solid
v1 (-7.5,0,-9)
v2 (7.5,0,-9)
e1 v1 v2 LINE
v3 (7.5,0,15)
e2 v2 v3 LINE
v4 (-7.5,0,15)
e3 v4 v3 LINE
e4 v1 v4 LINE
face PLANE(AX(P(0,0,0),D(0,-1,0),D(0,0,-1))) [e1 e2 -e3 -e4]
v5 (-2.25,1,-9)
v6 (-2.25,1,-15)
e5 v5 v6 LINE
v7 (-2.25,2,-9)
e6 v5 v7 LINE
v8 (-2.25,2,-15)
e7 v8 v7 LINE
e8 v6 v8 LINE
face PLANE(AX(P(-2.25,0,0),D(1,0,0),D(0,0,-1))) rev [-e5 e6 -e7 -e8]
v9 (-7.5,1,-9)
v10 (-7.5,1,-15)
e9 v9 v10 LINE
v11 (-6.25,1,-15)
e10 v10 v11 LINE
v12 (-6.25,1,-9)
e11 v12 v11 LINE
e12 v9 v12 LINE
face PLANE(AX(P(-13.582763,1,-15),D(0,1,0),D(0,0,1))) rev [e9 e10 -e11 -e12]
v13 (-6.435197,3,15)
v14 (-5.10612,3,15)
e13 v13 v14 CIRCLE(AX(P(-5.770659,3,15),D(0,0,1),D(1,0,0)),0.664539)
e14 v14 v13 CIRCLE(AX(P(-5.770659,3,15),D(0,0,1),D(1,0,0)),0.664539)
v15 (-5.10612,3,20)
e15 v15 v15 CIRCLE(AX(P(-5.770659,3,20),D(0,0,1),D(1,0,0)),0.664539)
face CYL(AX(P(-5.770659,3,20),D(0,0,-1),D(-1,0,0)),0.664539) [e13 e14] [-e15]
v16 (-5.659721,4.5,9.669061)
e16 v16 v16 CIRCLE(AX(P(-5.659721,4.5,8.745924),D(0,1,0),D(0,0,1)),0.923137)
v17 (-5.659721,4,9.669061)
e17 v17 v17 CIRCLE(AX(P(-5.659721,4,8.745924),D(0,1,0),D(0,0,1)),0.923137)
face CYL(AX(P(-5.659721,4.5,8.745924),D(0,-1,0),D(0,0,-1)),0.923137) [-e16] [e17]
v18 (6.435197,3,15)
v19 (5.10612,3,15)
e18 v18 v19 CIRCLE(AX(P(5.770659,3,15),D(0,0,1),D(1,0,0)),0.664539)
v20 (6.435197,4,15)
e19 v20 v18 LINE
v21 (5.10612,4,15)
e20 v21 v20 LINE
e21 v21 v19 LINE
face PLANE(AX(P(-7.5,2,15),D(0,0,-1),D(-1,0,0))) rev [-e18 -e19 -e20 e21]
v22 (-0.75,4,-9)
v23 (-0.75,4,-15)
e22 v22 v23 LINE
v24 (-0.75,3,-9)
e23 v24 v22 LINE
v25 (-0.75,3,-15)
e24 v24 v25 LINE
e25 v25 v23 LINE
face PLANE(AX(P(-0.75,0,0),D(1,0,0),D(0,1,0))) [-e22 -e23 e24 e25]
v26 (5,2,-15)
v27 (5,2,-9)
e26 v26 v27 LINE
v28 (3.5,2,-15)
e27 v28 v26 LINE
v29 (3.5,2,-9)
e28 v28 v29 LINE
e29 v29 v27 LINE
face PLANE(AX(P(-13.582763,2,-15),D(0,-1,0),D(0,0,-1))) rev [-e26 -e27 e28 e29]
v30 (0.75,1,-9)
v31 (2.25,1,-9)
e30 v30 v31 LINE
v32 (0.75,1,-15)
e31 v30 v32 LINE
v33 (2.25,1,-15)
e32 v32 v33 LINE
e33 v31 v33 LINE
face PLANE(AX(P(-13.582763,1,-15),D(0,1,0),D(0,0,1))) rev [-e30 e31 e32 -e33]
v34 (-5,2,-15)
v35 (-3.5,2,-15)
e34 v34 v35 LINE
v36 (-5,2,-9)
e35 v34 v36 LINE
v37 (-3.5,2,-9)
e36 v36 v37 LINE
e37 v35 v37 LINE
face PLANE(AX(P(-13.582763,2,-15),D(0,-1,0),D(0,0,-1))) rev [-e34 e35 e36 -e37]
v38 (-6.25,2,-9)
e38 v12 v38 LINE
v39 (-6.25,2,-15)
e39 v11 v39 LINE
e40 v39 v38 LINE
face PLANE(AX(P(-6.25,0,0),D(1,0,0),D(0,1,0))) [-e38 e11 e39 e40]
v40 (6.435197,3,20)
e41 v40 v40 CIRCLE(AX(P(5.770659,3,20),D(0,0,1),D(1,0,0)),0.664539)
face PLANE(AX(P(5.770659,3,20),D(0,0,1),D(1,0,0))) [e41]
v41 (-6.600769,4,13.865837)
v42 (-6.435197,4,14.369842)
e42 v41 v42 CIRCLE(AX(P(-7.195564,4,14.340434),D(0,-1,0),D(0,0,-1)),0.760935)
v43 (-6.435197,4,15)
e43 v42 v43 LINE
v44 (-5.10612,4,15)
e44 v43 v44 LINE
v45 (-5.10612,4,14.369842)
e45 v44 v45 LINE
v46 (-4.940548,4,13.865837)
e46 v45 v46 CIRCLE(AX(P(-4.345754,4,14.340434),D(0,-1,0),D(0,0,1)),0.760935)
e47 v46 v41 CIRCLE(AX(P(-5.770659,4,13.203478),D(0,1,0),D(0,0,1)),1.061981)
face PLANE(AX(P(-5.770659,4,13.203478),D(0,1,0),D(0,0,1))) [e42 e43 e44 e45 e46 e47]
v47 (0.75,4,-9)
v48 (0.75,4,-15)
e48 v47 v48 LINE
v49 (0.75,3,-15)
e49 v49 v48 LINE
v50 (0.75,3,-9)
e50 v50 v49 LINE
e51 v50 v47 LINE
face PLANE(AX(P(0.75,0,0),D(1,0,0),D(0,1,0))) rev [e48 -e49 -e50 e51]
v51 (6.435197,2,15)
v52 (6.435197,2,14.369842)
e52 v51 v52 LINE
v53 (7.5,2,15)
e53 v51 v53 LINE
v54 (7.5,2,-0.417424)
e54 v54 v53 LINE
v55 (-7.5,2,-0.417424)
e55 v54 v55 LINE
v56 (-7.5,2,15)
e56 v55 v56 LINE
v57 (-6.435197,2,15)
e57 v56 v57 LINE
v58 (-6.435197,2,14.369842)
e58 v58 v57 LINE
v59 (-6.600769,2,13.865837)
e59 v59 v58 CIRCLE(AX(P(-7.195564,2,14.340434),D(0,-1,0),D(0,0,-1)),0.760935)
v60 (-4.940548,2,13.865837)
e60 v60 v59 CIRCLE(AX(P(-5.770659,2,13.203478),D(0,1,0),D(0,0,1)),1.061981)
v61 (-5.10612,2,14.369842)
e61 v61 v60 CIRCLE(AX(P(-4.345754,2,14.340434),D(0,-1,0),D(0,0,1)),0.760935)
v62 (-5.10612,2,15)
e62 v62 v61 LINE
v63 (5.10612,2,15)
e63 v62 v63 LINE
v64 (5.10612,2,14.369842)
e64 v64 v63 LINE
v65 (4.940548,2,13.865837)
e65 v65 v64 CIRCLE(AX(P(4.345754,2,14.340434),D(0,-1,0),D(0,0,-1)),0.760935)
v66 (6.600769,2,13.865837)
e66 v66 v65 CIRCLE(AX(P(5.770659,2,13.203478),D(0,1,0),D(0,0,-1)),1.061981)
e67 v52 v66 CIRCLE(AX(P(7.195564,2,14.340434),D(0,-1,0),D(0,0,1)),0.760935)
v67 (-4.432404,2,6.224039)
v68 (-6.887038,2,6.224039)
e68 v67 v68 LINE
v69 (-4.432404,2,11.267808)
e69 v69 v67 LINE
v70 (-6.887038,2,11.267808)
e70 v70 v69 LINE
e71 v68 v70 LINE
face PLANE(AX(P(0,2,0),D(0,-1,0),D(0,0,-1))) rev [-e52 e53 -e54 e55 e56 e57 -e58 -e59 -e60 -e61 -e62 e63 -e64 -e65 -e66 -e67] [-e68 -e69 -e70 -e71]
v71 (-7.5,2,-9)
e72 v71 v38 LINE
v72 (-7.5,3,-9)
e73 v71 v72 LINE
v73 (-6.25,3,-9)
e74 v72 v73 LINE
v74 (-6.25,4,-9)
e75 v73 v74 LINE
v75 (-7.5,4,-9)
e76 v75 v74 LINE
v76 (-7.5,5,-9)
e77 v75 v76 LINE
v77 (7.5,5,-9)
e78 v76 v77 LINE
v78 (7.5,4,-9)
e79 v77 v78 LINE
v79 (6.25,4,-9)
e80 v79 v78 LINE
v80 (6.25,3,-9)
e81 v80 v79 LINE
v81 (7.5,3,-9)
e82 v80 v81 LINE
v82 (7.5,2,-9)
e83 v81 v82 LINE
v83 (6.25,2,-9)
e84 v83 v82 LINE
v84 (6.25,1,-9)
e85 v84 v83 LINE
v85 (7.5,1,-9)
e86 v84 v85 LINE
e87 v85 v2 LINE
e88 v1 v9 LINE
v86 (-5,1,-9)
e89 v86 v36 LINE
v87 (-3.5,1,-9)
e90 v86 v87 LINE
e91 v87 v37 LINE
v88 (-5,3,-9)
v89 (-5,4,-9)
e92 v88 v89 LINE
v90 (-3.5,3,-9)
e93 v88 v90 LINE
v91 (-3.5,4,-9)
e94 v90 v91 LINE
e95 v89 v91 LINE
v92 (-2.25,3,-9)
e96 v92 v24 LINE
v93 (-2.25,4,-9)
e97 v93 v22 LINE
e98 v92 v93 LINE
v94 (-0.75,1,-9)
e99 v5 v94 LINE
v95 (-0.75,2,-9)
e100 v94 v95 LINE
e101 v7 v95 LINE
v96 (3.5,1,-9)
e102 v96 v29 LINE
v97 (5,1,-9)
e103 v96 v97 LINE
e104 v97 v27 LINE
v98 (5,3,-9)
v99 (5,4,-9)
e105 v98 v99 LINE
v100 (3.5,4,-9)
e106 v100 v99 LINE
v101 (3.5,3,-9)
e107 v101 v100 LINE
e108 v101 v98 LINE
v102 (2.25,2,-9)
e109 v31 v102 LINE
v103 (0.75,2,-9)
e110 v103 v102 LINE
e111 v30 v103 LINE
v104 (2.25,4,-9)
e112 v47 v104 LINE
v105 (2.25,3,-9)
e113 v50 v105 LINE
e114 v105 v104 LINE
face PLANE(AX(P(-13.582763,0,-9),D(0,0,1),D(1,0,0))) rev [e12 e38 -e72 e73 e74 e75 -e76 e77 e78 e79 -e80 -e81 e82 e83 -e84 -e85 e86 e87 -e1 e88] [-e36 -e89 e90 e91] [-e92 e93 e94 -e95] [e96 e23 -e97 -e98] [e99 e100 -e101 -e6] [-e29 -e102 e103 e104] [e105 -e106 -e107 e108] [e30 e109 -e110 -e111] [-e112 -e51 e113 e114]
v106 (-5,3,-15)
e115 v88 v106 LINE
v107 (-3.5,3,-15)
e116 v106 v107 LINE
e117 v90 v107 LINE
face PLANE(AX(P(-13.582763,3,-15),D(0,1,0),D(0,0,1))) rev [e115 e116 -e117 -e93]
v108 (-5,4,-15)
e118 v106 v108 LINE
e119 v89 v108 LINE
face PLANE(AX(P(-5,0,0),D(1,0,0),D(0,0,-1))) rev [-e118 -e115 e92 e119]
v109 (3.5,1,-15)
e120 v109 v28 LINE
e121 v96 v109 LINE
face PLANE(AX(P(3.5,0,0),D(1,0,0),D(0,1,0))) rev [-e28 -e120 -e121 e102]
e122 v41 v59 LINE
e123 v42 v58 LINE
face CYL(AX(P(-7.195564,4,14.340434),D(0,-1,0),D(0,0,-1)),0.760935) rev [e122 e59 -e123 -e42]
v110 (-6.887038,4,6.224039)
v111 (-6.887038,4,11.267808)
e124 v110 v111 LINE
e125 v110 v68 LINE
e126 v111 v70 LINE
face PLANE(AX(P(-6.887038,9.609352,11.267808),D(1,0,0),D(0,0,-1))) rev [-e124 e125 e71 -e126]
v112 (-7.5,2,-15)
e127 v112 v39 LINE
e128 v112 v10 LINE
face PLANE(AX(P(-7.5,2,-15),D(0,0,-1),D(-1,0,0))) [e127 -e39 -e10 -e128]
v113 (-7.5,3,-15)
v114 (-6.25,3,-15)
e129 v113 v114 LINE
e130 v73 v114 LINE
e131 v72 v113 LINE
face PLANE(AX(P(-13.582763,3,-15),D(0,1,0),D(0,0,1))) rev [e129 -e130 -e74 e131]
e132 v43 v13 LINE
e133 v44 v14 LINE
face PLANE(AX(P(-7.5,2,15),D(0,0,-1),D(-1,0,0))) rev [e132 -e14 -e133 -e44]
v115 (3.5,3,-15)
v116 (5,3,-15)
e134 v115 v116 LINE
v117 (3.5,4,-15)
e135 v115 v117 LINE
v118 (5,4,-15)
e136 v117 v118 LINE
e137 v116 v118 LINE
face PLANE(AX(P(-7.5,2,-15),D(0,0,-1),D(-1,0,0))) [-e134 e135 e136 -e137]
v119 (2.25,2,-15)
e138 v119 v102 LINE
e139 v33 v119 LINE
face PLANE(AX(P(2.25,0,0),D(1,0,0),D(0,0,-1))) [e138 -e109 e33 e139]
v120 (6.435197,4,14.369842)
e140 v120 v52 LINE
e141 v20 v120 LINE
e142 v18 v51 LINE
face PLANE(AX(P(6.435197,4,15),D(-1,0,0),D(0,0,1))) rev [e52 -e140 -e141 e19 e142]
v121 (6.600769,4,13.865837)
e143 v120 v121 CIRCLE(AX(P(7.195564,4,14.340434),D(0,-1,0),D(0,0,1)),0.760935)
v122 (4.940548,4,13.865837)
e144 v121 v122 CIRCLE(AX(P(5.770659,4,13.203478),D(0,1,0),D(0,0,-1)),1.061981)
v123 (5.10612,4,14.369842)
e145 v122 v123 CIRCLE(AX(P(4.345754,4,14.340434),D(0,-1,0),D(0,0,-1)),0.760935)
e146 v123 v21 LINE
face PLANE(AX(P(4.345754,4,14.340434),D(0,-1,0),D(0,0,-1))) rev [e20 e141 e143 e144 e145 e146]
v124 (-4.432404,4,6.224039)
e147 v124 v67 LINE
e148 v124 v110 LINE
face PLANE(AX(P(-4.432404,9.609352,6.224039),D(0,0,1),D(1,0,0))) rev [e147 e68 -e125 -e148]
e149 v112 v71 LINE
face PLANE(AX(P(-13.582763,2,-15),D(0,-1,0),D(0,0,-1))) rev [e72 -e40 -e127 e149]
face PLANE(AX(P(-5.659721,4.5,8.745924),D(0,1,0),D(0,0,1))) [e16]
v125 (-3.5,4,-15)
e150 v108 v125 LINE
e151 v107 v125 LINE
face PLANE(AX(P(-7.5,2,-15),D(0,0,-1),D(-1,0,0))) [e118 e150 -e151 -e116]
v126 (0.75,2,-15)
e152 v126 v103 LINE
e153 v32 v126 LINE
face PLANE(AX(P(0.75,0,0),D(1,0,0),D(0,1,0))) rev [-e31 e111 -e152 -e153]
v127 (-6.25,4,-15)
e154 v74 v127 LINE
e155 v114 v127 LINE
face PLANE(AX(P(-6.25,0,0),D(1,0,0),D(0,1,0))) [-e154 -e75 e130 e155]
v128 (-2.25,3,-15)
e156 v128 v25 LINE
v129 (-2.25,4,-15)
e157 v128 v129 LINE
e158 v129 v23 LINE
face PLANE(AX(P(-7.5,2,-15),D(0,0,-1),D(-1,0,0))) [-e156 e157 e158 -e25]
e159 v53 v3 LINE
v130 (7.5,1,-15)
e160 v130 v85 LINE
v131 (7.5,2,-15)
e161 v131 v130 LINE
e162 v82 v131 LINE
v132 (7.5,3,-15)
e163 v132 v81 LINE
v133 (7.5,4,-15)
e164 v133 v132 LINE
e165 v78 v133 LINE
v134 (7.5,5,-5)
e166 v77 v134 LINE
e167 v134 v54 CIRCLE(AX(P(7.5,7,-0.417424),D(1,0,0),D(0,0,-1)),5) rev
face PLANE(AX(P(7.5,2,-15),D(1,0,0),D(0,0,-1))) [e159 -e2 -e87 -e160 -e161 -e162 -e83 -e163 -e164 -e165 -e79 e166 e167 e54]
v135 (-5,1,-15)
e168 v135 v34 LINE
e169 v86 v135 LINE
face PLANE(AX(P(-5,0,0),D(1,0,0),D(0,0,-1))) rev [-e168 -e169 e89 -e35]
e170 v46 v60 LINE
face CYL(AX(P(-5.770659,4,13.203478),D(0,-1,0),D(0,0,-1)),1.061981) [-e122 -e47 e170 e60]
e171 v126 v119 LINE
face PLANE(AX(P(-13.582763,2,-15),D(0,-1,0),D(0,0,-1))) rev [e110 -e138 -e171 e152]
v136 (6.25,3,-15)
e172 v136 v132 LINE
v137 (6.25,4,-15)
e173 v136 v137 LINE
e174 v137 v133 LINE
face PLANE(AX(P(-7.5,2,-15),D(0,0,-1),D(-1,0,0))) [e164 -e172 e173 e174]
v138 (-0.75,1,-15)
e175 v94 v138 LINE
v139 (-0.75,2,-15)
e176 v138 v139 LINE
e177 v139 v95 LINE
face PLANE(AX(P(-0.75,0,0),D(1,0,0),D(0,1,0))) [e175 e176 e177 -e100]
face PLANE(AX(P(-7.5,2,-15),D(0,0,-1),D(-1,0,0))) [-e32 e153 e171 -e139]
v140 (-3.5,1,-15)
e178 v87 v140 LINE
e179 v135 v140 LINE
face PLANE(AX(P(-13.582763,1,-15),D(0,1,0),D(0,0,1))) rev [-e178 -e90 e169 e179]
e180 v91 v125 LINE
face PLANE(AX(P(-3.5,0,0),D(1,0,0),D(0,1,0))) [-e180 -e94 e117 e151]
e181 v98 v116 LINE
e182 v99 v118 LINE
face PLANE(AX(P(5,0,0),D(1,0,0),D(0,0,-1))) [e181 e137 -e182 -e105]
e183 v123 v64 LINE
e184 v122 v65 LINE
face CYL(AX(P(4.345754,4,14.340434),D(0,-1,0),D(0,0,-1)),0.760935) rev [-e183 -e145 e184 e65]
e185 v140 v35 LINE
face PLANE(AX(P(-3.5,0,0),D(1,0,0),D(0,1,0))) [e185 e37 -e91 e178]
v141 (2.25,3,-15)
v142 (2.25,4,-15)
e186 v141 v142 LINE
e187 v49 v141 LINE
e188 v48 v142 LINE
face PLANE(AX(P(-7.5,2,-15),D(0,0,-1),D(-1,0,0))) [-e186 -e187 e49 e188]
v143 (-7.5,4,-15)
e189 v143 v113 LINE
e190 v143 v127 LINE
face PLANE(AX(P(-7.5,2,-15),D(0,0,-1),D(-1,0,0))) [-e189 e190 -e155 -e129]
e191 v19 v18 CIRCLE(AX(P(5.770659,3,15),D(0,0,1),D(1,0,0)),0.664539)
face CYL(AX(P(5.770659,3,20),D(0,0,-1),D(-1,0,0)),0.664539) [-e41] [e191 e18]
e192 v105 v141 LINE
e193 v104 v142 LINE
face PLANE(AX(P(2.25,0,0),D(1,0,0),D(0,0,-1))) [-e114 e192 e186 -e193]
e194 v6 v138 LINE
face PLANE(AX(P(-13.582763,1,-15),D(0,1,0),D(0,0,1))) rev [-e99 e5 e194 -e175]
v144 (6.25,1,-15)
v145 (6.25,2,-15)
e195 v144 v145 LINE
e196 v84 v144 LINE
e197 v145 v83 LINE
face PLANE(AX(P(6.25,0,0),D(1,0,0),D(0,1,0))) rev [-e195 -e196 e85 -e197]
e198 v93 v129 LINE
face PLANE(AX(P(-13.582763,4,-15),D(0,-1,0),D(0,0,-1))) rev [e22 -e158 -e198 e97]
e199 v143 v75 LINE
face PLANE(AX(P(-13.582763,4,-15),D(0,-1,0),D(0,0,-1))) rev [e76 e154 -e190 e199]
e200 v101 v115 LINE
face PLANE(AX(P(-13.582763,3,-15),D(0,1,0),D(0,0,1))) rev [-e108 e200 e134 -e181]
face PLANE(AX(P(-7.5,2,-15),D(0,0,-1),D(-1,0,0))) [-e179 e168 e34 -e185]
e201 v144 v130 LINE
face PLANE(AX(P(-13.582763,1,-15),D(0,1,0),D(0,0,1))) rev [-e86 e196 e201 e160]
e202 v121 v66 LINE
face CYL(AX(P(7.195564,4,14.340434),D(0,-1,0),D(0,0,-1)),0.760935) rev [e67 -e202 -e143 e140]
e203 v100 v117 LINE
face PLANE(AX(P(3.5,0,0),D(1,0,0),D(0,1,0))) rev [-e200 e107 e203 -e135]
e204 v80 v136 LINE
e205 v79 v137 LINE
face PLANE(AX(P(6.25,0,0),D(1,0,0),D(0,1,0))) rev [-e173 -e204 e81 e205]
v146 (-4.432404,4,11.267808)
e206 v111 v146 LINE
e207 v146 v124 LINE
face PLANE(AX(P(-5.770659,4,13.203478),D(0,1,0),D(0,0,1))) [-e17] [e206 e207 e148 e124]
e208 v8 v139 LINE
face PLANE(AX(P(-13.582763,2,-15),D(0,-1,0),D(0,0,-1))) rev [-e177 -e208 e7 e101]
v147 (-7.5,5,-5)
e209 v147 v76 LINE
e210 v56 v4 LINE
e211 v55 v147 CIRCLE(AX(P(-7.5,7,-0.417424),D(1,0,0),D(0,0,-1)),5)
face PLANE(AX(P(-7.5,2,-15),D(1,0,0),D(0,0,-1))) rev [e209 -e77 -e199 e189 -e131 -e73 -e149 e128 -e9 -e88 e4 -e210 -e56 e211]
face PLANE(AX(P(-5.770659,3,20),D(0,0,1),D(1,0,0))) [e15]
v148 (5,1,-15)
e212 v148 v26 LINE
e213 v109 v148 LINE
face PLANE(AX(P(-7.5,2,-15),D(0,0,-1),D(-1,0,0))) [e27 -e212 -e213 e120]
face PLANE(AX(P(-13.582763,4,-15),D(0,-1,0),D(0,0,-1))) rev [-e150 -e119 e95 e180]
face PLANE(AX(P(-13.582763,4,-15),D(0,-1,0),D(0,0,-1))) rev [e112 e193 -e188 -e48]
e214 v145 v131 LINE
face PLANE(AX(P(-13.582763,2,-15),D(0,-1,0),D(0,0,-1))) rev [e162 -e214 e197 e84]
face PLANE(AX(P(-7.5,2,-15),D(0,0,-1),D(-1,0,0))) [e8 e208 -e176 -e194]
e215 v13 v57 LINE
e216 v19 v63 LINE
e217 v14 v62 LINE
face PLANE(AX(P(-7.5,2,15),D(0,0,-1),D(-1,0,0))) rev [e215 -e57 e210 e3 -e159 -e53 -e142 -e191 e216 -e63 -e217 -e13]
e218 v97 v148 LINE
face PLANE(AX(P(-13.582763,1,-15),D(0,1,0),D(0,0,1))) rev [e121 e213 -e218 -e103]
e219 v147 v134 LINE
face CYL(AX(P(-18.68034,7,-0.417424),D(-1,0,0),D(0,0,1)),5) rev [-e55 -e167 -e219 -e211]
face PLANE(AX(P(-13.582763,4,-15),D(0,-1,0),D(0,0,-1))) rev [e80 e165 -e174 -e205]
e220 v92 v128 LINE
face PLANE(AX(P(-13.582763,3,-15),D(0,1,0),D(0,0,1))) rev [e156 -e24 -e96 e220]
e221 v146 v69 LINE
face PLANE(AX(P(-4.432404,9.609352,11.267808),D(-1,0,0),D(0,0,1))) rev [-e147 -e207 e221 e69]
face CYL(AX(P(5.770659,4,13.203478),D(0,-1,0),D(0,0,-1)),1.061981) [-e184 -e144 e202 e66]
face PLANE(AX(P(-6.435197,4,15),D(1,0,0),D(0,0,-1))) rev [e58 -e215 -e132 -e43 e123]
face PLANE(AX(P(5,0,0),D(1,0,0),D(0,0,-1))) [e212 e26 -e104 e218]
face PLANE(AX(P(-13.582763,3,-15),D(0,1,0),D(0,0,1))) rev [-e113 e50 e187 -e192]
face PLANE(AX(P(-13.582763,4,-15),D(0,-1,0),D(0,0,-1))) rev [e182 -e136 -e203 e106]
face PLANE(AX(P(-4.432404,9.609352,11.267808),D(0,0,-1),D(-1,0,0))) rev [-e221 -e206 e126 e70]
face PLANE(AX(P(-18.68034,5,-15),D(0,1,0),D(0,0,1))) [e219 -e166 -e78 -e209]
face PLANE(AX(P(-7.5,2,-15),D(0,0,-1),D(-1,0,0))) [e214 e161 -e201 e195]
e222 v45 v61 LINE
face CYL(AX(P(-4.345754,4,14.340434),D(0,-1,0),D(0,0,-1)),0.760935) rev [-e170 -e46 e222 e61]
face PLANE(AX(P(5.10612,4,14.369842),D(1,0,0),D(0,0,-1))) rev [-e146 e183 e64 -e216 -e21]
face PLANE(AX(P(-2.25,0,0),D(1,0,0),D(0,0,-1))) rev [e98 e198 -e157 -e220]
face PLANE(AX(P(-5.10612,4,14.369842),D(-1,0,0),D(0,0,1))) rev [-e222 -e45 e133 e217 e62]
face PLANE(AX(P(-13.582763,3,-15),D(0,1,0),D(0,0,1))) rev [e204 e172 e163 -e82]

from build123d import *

# Parameters (mm, degrees)
SKETCH2_W           = 15
SKETCH2_H           = 30
BOSS_EXTRUDE1_DEPTH = 2
SKETCH3_W           = 10
SKETCH3_H           = 5
BOSS_EXTRUDE2_DEPTH = 15
SKETCH4_W           = 6
SKETCH4_H           = 1
CUT_EXTRUDE1_DEPTH  = 15
SKETCH5_W           = 1.25
SKETCH5_H           = 6
SKETCH5_W_2         = 0.75
CUT_EXTRUDE2_DEPTH  = 18.24093965
FILLET1_R           = 5
BOSS_EXTRUDE3_DEPTH = 2
SKETCH7_R           = 0.66453872
BOSS_EXTRUDE4_DEPTH = 5
SKETCH8_W           = 2.454634116
SKETCH8_H           = 5.043768733
BOSS_EXTRUDE5_DEPTH = 2
SKETCH9_R           = 0.923137451
BOSS_EXTRUDE6_DEPTH = 0.5


with BuildPart() as part:
    # Sketch2 → Boss-Extrude1 (new body)
    with BuildSketch(Plane(origin=(0, 0, 0), x_dir=(1, 0, 0), z_dir=(0, 1, 0))):
        Rectangle(SKETCH2_W, SKETCH2_H)
    extrude(amount=BOSS_EXTRUDE1_DEPTH)

    # Sketch3 → Boss-Extrude2 (add)
    with BuildSketch(Plane(origin=(7.5, 0, 0), x_dir=(0, 0, -1), z_dir=(1, 0, 0))):
        with Locations((10, 2.5)):
            Rectangle(SKETCH3_W, SKETCH3_H)
    extrude(amount=-BOSS_EXTRUDE2_DEPTH)

    # Sketch4 → Cut-Extrude1 (cut)
    with BuildSketch(Plane(origin=(7.5, 0, 0), x_dir=(0, 0, -1), z_dir=(1, 0, 0))):
        with Locations((12, 0.5)):
            Rectangle(SKETCH4_W, SKETCH4_H)
        with Locations((12, 2.5)):
            Rectangle(SKETCH4_W, SKETCH4_H)
        with Locations((12, 4.5)):
            Rectangle(SKETCH4_W, SKETCH4_H)
    extrude(amount=-CUT_EXTRUDE1_DEPTH, mode=Mode.SUBTRACT)

    # Sketch5 → Cut-Extrude2 (cut, through all)
    with BuildSketch(Plane(origin=(0, 4, 0), x_dir=(1, 0, 0), z_dir=(0, 1, 0))):
        with Locations((5.625, 12)):
            Rectangle(SKETCH5_W, SKETCH5_H)
        with Locations((2.875, 12)):
            Rectangle(SKETCH5_W, SKETCH5_H)
        with Locations((0.375, 12)):
            Rectangle(SKETCH5_W_2, SKETCH5_H)
        with Locations((-0.375, 12)):
            Rectangle(SKETCH5_W_2, SKETCH5_H)
        with Locations((-2.875, 12)):
            Rectangle(SKETCH5_W, SKETCH5_H)
        with Locations((-5.625, 12)):
            Rectangle(SKETCH5_W, SKETCH5_H)
    extrude(amount=-CUT_EXTRUDE2_DEPTH, mode=Mode.SUBTRACT)

    # Fillet1
    # the kernel refuses this fillet: 5 mm, written as the material it adds along each edge
    with BuildSketch(Plane(origin=(-7.5, 2, -5), x_dir=(0, 1, 0), z_dir=(1, 0, 0))) as fillet1_piece_1:
        with BuildLine():
            CenterArc((5, 4.582575695), FILLET1_R, 180, 66.421821522)
            Line((0, 4.582575695), (-0.1, 4.582575695))
            Line((-0.1, 4.582575695), (-0.1, 0))
            Line((-0.1, 0), (0, -0.1))
            ThreePointArc((0, -0.1), (1.5, -0.1), (2.96, -0.091651514))
            Line((2.96, -0.091651514), (3, 0))
        make_face()
    extrude(amount=15)

    # Sketch6 → Boss-Extrude3 (add)
    with BuildSketch(Plane(origin=(0, 2, 0), x_dir=(1, 0, 0), z_dir=(0, 1, 0))):
        with BuildLine():
            Line((5.106120026, -14.369842053), (5.106120026, -15))
            Line((5.106120026, -15), (6.435197466, -15))
            Line((6.435197466, -15), (6.435197466, -14.369842053))
            ThreePointArc((6.435197466, -14.369842053), (6.472638981, -14.102943479), (6.600769462, -13.865837393))
            ThreePointArc((6.600769462, -13.865837393), (5.770658746, -12.141497566), (4.940548031, -13.865837393))
            ThreePointArc((4.940548031, -13.865837393), (5.068678511, -14.102943479), (5.106120026, -14.369842053))
        make_face()
        with BuildLine():
            Line((-6.435197466, -15), (-6.435197466, -14.369842053))
            ThreePointArc((-6.435197466, -14.369842053), (-6.472638981, -14.102943479), (-6.600769462, -13.865837393))
            ThreePointArc((-6.600769462, -13.865837393), (-5.770658746, -12.141497566), (-4.940548031, -13.865837393))
            ThreePointArc((-4.940548031, -13.865837393), (-5.068678511, -14.102943479), (-5.106120026, -14.369842053))
            Line((-5.106120026, -14.369842053), (-5.106120026, -15))
            Line((-5.106120026, -15), (-6.435197466, -15))
        make_face()
    extrude(amount=BOSS_EXTRUDE3_DEPTH)

    # Sketch7 → Boss-Extrude4 (add)
    with BuildSketch(Plane.XY.offset(15)):
        with Locations((-5.770658746, 3)):
            Circle(SKETCH7_R)
        with Locations((5.770658746, 3)):
            Circle(SKETCH7_R)
    extrude(amount=BOSS_EXTRUDE4_DEPTH)

    # Sketch8 → Boss-Extrude5 (add)
    with BuildSketch(Plane(origin=(0, 2, 0), x_dir=(1, 0, 0), z_dir=(0, 1, 0))):
        with Locations((-5.659720594, -8.745923689)):
            Rectangle(SKETCH8_W, SKETCH8_H)
    extrude(amount=BOSS_EXTRUDE5_DEPTH)

    # Sketch9 → Boss-Extrude6 (add)
    with BuildSketch(Plane(origin=(0, 4, 0), x_dir=(1, 0, 0), z_dir=(0, 1, 0))):
        with Locations(Location((-5.659720594, -8.745923689, 0), (0, 0, 270))):
            Circle(SKETCH9_R)
    extrude(amount=BOSS_EXTRUDE6_DEPTH)


solid = part.part
